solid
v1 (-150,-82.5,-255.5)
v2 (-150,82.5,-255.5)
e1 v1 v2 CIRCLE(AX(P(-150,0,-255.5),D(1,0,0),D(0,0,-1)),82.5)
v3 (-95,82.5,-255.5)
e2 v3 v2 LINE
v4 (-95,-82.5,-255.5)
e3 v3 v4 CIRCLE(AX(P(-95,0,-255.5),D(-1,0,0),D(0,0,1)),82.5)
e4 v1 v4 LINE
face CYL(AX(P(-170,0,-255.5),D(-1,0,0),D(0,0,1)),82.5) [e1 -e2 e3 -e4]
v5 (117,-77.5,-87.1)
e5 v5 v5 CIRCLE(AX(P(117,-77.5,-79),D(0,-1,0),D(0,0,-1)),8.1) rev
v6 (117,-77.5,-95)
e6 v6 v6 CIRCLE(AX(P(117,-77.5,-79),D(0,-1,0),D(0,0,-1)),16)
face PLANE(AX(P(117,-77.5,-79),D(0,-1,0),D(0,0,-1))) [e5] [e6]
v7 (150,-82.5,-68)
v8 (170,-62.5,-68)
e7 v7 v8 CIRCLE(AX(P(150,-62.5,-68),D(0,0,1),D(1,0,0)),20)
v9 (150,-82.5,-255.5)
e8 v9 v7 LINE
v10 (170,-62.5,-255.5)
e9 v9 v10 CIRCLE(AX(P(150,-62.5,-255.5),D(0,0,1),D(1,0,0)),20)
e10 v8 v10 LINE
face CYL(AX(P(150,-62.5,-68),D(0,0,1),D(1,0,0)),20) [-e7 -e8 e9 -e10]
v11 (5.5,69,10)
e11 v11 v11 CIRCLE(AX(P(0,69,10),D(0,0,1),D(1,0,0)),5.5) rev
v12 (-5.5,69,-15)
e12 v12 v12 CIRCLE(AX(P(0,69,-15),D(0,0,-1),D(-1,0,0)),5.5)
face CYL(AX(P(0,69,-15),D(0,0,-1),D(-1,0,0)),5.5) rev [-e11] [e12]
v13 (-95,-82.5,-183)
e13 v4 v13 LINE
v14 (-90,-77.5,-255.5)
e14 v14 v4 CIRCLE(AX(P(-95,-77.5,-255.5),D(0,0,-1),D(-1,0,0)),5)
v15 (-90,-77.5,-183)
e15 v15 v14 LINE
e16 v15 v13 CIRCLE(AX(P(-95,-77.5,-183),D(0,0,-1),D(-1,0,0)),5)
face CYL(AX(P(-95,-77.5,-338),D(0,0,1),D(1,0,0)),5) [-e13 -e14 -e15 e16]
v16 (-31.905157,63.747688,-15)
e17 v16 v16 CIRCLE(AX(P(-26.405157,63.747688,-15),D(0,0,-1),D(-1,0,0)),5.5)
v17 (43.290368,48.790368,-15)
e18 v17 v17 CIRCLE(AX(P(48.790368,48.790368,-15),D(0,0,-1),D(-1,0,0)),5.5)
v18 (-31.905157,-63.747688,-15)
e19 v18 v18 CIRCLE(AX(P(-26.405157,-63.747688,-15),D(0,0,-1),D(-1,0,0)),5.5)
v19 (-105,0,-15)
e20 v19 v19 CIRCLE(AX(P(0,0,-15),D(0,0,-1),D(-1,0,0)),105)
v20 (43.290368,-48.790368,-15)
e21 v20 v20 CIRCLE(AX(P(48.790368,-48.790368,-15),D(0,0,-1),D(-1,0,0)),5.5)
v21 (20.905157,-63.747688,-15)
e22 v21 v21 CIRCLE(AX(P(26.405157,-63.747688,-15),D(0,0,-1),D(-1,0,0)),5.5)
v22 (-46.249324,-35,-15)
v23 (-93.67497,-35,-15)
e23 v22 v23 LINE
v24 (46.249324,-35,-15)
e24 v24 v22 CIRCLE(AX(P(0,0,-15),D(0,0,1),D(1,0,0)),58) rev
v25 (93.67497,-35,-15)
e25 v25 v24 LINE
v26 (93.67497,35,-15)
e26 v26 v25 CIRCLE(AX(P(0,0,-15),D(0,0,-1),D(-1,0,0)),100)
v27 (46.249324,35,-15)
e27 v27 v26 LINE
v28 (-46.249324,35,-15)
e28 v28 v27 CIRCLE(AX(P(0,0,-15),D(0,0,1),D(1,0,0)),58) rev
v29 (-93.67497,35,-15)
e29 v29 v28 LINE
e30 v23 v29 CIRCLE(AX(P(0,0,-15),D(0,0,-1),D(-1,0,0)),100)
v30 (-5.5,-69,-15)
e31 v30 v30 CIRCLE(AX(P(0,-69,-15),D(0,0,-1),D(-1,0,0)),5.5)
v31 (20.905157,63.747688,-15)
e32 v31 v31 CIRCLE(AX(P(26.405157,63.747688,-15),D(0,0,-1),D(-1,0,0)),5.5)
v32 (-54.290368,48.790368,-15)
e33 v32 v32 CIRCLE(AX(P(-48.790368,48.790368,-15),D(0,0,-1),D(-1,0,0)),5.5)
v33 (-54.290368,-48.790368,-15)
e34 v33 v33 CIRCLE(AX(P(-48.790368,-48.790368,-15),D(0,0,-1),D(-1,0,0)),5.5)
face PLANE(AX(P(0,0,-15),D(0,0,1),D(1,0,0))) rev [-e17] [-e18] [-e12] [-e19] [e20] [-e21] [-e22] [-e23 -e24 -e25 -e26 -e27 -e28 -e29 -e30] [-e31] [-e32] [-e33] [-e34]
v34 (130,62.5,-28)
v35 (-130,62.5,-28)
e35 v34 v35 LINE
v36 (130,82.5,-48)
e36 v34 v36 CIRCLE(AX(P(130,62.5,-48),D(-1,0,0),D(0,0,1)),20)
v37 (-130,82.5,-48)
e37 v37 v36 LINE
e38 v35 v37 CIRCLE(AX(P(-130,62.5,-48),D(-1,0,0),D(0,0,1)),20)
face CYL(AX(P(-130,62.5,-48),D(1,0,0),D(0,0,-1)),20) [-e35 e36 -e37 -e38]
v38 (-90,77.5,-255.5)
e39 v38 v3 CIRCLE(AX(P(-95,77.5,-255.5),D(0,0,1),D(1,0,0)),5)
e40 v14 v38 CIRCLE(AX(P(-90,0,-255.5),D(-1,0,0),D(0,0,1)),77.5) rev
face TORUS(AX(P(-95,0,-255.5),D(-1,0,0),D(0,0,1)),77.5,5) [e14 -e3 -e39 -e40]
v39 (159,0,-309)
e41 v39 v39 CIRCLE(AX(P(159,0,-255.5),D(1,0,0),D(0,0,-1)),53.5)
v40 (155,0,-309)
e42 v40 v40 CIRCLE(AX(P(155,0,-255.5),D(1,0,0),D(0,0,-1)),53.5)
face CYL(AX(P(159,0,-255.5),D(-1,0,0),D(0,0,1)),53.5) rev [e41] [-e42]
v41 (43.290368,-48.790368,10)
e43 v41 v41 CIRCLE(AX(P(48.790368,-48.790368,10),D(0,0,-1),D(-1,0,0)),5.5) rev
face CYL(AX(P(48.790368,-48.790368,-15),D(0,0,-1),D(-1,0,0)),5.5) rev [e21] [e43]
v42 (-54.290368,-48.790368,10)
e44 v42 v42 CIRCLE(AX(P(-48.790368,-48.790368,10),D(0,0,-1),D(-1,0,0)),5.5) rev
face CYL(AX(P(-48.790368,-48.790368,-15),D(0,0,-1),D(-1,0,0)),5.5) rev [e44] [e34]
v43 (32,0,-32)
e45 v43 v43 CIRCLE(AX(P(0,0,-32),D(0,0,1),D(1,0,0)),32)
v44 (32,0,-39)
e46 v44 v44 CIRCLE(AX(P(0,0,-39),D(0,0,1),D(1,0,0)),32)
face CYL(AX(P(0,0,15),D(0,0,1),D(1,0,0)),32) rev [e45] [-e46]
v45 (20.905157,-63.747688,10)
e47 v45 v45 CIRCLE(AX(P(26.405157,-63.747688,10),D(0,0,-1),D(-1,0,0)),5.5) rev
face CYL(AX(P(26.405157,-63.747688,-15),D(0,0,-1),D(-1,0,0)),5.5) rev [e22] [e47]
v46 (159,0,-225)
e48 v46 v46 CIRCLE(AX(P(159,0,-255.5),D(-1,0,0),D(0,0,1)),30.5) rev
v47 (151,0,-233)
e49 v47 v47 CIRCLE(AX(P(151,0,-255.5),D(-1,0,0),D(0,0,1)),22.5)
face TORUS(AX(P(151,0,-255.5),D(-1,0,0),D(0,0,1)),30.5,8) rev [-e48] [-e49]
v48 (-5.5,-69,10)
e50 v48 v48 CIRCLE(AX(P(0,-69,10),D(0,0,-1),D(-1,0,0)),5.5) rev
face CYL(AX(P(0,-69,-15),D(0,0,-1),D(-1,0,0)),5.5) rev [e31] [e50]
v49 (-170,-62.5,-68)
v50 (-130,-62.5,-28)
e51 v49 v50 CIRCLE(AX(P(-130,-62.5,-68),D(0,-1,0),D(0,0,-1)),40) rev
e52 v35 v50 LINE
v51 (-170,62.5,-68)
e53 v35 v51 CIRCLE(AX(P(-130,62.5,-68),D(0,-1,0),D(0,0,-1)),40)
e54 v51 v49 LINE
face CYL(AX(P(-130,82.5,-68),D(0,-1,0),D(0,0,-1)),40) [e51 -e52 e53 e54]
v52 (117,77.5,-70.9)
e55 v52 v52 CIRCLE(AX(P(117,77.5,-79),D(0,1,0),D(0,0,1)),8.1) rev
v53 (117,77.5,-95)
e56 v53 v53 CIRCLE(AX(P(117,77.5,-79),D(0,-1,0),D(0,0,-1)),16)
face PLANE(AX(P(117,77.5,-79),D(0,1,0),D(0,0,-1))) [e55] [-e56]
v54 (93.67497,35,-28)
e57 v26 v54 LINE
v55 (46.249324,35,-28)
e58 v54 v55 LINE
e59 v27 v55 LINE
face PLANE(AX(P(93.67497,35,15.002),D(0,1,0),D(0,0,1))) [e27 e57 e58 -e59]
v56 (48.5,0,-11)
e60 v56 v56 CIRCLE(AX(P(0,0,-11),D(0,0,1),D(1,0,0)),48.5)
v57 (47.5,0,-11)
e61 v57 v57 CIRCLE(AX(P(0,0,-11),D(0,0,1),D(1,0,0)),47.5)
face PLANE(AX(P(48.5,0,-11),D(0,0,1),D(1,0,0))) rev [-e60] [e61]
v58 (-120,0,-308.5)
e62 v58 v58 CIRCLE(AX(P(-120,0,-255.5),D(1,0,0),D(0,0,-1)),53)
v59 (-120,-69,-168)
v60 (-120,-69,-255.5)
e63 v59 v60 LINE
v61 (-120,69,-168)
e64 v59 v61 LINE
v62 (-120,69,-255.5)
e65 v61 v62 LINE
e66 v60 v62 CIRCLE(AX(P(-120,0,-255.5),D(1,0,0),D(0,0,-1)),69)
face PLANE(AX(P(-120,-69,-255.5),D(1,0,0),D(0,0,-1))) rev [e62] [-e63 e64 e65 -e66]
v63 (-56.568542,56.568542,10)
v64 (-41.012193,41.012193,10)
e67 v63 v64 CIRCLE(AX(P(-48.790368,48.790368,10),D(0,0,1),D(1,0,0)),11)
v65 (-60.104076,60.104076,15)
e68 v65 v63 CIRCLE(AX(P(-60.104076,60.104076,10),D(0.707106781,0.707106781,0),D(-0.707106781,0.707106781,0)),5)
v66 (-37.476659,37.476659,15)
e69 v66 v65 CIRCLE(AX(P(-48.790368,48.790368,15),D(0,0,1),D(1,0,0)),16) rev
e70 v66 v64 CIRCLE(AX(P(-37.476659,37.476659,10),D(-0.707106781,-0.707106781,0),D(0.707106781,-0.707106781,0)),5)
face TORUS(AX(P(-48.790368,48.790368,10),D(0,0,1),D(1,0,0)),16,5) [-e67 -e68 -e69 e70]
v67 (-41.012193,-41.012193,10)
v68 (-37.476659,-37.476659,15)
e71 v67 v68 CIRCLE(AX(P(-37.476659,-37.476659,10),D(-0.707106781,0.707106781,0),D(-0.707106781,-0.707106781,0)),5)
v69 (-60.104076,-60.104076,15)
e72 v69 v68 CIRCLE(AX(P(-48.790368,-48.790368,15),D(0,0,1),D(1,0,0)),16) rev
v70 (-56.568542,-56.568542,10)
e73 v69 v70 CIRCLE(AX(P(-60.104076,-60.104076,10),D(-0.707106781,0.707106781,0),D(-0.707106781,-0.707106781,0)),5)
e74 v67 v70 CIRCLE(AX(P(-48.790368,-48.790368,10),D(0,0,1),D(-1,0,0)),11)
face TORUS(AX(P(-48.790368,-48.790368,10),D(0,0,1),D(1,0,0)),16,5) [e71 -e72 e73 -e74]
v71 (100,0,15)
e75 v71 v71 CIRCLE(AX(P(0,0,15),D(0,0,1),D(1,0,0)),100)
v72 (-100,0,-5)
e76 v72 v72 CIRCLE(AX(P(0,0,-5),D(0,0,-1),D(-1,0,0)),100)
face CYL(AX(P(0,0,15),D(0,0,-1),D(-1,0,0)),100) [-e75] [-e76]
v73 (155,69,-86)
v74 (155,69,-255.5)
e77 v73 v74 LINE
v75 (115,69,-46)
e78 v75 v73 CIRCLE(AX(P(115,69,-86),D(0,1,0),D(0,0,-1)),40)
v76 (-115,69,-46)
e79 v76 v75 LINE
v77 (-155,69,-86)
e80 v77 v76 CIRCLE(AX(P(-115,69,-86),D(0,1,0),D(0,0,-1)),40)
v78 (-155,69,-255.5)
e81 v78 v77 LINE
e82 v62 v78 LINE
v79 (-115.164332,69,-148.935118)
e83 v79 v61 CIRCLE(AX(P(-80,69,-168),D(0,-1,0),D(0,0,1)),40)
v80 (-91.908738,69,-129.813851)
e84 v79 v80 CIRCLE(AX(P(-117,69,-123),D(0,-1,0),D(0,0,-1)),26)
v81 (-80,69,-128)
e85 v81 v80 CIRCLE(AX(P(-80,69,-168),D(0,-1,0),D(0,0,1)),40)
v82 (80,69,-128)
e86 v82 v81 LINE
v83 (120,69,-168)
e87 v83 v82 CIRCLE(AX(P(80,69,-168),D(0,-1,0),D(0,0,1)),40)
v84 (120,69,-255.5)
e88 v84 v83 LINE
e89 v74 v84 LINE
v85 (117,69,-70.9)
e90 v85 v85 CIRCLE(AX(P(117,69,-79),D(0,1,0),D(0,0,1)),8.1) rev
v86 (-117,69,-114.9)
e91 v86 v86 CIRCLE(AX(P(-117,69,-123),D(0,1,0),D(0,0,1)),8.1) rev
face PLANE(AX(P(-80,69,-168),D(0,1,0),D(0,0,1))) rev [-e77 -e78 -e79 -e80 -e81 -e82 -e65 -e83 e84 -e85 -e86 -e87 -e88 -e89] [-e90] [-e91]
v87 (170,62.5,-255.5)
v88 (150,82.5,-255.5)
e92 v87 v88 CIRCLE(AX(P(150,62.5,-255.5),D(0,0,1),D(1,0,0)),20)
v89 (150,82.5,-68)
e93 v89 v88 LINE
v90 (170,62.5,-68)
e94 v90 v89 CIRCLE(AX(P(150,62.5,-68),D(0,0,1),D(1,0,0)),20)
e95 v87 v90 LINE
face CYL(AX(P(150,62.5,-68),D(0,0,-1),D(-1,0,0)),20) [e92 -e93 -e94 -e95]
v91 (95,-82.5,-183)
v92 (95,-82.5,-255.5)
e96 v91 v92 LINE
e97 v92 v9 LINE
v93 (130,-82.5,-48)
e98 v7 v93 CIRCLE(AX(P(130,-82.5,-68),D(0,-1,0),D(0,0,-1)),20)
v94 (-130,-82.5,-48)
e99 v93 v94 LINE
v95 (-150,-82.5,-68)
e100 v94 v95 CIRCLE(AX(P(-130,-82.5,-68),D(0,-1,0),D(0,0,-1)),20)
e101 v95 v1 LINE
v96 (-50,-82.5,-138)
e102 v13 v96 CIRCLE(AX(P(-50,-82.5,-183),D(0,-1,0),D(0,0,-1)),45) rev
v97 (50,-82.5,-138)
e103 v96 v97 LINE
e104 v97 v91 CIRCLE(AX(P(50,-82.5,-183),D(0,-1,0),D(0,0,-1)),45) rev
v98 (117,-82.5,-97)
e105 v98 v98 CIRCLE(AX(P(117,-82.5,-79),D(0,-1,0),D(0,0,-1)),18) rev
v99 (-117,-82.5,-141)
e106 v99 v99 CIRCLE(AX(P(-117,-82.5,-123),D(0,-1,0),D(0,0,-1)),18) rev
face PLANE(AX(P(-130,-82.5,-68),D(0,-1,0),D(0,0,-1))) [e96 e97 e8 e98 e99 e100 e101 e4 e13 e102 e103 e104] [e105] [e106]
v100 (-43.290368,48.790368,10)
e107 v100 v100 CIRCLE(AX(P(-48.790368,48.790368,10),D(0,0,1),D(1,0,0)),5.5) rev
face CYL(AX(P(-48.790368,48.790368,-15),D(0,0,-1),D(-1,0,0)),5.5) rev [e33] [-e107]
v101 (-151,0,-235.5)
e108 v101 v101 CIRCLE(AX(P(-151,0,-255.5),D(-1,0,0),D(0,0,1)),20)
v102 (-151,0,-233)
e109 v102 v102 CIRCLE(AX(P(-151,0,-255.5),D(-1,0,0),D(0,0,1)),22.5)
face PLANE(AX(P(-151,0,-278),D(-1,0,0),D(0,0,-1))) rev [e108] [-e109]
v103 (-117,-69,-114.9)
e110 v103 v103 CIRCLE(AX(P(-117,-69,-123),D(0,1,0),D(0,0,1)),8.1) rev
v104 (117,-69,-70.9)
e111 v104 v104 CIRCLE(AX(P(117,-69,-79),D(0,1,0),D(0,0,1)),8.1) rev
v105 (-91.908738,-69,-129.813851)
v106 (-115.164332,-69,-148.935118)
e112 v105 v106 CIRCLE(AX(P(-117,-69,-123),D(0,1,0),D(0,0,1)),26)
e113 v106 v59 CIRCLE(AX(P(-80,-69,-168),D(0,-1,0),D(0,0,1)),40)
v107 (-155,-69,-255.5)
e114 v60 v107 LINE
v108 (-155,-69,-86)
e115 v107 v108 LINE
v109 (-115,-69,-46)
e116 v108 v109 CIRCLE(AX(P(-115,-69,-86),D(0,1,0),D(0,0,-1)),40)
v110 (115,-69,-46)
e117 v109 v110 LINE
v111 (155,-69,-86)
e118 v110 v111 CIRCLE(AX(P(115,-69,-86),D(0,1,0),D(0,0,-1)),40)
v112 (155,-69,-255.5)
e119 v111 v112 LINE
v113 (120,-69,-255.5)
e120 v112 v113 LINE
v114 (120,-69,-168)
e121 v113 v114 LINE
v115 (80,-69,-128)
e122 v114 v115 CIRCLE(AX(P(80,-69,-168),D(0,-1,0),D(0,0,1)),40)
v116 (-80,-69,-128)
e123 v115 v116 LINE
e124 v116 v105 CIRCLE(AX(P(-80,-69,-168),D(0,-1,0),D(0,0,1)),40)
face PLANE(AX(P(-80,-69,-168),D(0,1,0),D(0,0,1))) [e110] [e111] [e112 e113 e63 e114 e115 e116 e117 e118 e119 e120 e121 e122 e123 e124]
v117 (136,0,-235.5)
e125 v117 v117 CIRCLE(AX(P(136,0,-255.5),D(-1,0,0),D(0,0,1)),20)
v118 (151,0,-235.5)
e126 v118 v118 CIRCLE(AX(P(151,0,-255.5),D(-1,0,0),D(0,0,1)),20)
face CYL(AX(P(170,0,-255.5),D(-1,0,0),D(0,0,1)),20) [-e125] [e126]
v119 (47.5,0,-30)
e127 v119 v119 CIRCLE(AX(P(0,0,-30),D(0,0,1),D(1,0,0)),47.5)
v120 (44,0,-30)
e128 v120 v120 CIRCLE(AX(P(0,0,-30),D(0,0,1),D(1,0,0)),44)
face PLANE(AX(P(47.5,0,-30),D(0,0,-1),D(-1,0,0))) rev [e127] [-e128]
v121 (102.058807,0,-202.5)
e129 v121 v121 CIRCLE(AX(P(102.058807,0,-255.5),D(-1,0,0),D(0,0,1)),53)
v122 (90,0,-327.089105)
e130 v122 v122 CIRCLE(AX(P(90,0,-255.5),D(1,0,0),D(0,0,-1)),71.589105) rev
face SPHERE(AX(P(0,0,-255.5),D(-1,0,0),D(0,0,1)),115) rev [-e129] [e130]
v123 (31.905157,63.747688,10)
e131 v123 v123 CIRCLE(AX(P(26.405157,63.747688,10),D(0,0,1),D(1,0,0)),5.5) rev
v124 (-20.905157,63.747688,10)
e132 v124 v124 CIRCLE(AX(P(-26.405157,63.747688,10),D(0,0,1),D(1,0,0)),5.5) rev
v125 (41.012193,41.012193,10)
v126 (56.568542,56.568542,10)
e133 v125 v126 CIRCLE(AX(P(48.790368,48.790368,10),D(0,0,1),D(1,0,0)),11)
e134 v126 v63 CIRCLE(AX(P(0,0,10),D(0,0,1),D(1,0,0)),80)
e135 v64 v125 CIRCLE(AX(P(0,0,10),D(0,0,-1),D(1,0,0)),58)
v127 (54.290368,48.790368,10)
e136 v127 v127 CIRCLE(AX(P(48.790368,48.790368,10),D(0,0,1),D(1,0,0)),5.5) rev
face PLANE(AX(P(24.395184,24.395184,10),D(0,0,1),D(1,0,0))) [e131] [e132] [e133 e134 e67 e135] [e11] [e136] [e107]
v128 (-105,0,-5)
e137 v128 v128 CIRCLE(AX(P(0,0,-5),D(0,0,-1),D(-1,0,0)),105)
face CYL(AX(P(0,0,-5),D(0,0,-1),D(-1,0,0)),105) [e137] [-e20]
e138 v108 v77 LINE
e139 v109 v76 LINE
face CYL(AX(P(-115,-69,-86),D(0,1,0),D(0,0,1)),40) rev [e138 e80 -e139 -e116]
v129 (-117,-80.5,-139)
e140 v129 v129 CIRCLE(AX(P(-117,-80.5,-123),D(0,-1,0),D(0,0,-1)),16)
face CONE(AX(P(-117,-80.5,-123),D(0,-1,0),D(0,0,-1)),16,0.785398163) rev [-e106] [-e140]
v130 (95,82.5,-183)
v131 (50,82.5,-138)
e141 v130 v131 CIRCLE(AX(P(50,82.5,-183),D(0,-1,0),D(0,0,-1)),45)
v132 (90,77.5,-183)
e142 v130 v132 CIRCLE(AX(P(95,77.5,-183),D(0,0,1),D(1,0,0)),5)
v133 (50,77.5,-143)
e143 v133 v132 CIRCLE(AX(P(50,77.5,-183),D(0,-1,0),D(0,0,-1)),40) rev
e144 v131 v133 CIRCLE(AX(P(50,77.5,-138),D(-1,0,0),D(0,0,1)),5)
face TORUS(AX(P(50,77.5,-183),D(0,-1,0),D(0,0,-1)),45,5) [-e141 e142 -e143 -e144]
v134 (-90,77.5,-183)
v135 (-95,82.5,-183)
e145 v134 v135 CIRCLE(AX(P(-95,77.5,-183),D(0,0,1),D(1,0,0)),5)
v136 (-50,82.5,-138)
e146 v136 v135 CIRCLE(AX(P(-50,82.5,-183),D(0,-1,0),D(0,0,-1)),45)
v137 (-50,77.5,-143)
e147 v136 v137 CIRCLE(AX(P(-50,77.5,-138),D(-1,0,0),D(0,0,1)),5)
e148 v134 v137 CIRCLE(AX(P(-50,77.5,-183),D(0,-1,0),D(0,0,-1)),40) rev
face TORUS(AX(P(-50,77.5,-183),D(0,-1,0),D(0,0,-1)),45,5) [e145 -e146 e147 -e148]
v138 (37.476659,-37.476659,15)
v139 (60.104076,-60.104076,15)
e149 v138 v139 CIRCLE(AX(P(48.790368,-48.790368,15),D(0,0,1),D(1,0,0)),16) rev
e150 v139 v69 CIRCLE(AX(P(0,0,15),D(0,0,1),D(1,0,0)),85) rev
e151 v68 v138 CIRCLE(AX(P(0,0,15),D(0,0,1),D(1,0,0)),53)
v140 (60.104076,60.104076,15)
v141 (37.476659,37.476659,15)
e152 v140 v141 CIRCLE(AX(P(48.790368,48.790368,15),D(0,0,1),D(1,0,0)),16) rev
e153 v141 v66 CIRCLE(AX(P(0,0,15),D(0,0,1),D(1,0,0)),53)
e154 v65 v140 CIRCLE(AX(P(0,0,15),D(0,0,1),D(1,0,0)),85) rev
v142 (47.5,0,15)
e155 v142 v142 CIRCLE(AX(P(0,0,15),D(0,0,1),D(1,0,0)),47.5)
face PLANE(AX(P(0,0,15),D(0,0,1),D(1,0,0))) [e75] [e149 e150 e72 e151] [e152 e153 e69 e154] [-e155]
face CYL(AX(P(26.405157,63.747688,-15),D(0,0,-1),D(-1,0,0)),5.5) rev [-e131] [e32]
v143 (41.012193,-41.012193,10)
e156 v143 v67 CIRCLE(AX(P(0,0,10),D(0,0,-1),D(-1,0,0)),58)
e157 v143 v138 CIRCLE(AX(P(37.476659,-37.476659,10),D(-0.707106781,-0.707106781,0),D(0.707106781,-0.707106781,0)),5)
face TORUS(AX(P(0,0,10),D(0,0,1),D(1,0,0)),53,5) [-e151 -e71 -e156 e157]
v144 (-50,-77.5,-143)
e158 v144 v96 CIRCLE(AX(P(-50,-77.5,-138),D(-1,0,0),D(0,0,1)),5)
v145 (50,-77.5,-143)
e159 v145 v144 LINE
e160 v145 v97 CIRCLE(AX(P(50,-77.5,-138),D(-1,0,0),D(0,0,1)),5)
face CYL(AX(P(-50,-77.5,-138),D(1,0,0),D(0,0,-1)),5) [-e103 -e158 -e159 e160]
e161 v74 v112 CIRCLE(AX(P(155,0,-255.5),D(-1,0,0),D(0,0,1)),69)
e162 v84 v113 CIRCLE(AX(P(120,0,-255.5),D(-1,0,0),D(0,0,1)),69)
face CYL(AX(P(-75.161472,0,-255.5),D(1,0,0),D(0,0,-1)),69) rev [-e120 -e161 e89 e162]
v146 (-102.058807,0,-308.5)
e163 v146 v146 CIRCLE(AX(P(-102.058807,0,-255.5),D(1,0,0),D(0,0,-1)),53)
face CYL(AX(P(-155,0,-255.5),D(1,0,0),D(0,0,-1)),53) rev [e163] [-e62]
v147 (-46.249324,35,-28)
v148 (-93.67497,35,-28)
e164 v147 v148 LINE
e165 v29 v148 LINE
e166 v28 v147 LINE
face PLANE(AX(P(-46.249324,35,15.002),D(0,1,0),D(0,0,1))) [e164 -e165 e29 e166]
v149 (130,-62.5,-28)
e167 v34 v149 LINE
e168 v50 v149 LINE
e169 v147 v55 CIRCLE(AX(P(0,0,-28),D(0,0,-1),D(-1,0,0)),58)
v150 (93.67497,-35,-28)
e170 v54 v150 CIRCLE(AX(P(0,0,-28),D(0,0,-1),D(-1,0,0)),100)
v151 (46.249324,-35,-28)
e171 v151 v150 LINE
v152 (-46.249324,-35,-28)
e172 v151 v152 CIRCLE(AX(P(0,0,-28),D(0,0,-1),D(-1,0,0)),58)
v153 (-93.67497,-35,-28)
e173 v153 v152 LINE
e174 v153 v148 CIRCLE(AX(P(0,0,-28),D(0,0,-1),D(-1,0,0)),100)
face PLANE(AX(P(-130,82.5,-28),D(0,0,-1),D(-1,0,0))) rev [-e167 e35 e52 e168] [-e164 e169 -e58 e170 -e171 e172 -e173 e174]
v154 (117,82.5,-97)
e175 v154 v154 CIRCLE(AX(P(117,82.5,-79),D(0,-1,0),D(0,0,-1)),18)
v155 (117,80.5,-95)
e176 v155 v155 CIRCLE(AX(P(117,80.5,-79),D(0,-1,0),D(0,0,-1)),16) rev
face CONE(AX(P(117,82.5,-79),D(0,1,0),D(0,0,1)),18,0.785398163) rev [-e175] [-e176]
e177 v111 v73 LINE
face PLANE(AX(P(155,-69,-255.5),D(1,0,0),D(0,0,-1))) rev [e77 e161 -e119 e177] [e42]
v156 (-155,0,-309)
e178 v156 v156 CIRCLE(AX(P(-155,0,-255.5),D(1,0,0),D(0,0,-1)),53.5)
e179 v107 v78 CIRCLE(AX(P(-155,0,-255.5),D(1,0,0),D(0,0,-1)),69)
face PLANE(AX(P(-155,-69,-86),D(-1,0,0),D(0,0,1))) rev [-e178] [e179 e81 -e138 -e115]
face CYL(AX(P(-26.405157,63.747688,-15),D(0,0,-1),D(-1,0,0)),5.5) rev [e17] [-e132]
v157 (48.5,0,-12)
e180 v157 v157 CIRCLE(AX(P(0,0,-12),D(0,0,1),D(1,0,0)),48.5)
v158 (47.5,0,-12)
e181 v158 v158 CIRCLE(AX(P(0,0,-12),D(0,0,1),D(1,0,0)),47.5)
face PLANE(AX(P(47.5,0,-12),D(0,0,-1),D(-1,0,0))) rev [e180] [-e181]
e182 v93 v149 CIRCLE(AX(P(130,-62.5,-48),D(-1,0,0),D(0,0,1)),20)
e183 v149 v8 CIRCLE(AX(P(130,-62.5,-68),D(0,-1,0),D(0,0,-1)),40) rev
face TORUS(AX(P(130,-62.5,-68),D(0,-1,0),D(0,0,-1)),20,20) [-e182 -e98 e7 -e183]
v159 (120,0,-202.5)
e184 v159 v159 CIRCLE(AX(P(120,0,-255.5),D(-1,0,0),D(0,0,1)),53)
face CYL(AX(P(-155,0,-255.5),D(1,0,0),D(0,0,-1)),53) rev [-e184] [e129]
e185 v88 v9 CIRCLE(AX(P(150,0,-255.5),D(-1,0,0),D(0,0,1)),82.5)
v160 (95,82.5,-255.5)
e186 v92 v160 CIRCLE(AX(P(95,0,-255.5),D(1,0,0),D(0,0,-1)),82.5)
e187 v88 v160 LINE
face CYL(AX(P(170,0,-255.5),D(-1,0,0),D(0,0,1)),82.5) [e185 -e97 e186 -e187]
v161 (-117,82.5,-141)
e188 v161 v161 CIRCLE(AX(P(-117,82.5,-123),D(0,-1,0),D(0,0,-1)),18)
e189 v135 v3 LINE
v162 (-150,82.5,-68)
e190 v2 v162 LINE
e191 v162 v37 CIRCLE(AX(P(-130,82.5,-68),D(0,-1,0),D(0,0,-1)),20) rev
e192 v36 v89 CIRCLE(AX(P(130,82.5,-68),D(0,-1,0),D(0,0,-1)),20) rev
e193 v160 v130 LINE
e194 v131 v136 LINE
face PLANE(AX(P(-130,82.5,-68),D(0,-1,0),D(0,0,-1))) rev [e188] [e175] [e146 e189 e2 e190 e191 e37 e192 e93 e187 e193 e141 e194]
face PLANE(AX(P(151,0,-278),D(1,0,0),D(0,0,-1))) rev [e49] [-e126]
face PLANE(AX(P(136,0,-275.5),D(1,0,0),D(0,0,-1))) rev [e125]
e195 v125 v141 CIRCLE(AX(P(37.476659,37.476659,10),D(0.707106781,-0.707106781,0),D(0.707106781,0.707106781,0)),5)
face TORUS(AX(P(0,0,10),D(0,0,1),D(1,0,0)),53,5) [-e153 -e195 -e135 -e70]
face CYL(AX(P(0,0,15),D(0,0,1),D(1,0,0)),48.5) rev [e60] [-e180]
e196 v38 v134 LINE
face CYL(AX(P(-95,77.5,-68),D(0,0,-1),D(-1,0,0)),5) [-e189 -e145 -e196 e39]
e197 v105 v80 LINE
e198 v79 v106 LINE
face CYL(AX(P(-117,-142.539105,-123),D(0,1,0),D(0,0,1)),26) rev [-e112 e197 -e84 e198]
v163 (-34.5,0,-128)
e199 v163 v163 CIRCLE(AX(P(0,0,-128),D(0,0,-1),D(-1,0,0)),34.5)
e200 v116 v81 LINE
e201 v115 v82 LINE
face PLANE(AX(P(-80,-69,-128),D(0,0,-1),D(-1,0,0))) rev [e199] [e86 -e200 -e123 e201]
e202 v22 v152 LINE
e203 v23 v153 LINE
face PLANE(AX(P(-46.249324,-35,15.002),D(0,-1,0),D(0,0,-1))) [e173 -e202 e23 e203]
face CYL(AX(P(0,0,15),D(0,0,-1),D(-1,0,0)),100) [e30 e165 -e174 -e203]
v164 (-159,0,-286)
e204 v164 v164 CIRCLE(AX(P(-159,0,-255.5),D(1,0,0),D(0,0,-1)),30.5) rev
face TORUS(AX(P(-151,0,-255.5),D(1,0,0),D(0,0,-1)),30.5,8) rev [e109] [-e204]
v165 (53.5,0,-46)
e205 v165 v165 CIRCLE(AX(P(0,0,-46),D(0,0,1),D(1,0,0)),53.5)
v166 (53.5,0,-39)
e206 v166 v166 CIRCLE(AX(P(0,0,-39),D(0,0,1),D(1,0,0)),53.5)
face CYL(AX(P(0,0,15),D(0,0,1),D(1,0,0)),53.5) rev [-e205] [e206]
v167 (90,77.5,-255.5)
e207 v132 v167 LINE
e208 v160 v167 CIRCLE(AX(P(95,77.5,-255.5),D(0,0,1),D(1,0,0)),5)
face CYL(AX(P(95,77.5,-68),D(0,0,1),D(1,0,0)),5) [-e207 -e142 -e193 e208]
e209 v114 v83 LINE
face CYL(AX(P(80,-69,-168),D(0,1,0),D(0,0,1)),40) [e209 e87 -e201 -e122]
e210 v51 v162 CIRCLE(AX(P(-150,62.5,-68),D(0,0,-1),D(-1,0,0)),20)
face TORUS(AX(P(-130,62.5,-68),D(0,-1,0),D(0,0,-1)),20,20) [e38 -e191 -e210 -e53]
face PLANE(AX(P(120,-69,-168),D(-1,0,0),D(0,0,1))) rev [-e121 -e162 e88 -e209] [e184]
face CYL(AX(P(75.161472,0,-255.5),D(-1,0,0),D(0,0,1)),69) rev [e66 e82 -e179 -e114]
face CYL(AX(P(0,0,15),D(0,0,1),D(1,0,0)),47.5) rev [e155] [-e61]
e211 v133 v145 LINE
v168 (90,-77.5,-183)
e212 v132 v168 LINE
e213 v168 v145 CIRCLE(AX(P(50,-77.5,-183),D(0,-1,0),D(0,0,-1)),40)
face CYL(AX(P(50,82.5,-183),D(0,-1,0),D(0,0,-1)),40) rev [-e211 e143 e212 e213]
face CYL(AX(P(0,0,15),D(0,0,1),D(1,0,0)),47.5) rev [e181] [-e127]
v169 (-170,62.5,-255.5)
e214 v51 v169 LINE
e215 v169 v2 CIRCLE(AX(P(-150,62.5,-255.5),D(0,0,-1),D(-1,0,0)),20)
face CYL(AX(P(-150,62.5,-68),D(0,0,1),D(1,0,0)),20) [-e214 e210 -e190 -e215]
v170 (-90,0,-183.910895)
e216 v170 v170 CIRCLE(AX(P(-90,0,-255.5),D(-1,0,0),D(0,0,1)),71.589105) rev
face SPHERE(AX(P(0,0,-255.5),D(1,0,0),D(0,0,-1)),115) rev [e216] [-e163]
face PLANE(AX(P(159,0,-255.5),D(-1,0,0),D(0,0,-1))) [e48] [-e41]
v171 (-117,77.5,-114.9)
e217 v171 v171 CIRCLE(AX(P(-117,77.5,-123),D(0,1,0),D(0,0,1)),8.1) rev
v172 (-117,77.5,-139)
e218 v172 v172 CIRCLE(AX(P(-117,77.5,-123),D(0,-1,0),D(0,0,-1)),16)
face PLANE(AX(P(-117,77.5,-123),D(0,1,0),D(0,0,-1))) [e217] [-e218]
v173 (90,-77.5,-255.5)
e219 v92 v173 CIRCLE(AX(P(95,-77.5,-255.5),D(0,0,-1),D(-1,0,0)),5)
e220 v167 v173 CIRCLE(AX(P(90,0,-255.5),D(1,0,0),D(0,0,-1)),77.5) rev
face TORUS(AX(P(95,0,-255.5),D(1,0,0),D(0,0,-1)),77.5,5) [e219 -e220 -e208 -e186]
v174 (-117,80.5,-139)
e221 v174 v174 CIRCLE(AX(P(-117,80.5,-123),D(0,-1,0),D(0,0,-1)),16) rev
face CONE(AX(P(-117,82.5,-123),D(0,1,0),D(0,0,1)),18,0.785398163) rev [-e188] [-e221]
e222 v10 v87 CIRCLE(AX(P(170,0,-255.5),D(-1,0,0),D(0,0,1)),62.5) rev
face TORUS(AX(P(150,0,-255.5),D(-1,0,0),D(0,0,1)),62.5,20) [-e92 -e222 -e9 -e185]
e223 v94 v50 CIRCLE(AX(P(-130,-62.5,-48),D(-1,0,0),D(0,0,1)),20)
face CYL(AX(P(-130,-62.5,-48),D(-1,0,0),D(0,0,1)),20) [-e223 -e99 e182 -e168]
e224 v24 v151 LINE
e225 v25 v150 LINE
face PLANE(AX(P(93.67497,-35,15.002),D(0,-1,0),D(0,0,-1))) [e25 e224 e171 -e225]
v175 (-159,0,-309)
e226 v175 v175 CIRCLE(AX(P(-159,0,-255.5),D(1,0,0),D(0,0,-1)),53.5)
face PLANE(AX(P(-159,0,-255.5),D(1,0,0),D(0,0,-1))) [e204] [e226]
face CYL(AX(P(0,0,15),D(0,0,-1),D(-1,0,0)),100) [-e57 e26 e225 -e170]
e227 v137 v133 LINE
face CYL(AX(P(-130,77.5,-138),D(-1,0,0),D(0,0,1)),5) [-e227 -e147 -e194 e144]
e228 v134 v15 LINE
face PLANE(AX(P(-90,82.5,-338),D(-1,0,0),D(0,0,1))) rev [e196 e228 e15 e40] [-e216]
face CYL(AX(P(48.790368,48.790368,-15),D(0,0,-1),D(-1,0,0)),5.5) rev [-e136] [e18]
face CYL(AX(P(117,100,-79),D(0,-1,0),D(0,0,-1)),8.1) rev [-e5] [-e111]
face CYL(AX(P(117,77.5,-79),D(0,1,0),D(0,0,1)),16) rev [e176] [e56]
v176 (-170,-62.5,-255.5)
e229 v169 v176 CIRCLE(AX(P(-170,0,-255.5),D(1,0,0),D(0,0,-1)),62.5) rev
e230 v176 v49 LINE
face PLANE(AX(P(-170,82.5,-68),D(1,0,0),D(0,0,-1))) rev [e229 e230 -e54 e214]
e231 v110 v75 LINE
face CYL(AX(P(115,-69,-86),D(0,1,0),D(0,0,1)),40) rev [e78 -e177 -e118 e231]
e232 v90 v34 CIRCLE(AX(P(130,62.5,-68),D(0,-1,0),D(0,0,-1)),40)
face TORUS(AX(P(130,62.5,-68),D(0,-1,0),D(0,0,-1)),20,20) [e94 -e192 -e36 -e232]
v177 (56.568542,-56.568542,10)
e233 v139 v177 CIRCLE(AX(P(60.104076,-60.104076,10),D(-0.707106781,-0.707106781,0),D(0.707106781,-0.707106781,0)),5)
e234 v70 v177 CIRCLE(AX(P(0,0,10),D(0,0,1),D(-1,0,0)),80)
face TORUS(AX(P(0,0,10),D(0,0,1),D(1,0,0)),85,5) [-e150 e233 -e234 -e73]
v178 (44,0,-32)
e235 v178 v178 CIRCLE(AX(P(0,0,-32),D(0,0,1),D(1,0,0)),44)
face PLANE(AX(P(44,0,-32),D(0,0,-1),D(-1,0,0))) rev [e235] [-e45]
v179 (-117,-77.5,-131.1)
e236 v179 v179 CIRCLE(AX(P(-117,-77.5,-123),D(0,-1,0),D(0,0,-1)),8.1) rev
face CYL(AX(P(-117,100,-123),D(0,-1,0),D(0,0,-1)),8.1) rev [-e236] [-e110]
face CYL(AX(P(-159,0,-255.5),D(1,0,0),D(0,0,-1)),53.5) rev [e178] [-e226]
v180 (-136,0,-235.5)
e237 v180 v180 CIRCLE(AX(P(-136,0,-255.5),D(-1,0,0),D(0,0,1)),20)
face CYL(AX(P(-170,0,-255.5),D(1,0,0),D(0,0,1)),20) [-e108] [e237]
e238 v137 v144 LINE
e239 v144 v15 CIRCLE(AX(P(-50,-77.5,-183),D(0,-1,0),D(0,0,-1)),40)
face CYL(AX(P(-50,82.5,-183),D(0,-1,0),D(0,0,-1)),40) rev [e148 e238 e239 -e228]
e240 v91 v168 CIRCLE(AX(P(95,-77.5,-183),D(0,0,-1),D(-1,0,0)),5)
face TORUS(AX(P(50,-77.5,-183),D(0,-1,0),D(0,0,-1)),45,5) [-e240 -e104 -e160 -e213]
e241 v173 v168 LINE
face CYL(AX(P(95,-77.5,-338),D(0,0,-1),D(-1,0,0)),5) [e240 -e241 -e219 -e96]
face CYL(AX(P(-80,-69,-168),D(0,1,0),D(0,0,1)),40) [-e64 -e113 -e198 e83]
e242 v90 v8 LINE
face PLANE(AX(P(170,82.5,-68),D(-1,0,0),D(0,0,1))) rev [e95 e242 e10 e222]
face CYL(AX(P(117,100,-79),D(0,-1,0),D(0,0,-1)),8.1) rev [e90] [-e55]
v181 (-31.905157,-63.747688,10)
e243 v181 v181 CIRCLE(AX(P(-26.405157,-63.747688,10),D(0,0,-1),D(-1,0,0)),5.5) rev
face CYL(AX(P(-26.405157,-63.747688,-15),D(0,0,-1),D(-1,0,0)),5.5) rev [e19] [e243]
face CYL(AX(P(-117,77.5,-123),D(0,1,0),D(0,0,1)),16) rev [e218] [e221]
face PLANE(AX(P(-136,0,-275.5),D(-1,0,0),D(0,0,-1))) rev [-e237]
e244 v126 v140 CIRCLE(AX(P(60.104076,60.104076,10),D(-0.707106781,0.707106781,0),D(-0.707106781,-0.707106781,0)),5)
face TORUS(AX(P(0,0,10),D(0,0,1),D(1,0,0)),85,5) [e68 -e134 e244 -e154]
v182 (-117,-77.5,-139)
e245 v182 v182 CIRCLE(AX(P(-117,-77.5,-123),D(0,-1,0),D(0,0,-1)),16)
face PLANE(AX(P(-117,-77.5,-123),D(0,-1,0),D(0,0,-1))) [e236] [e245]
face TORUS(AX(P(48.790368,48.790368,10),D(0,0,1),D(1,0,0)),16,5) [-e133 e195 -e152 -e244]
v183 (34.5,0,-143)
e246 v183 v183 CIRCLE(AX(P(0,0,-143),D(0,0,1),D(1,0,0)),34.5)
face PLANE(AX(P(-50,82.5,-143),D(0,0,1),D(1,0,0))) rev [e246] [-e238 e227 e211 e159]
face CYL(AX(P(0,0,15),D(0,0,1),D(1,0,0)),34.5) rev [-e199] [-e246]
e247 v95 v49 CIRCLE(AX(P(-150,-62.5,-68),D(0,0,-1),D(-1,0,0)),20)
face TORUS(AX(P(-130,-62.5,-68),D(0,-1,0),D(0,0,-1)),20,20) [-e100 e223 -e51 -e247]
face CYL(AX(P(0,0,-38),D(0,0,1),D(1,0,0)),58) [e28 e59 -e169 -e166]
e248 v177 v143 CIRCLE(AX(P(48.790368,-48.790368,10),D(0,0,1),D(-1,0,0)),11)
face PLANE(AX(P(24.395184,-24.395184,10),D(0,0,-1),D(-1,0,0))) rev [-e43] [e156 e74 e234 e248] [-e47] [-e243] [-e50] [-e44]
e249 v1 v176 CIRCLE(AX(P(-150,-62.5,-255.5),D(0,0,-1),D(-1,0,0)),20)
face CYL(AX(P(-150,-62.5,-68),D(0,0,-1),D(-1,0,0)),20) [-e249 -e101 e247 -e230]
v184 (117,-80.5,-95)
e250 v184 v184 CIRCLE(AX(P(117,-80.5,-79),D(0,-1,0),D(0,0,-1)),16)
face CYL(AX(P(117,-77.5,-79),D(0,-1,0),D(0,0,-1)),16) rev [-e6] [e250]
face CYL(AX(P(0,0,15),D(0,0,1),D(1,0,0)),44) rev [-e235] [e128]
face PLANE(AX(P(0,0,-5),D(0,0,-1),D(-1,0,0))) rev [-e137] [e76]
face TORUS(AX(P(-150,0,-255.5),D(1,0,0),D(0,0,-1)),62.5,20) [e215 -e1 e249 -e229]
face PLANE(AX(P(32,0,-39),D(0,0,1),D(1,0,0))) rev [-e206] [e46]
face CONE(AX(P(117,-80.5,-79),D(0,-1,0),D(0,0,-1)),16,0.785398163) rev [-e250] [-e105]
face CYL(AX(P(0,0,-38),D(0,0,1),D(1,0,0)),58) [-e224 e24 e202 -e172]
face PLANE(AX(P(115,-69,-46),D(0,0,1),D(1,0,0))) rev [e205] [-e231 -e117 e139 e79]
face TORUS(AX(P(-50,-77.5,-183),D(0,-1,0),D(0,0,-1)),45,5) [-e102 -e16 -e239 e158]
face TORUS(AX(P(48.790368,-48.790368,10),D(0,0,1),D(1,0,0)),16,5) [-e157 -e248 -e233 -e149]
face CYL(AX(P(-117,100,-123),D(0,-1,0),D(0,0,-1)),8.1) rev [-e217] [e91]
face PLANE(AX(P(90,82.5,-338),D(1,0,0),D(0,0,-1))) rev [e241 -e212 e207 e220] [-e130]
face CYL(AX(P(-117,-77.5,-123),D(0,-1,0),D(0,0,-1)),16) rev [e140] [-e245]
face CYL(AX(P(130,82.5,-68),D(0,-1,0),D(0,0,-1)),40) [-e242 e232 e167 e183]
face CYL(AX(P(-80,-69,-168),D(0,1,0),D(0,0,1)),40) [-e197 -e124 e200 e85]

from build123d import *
from build123d.topology import SkipClean

# Parameters (mm, degrees)
SKETCH1_R                  = 100
EXTRUDE1_DEPTH             = 15
F_11_0_11_DIAMETER_HOLE3_D = 11
EXTRUDE2_DEPTH             = 5
FILLET1_R                  = 5
SKETCH12_R                 = 58
EXTRUDE6_DEPTH             = 23
EXTRUDE7_REACH             = 153.026
EXTRUDE12_DEPTH            = 82.5
FILLET2_RADIUS             = 82.5
FILLET2_LENGTH             = 80
FILLET3_RADIUS             = 82.5
FILLET3_LENGTH             = 80
EXTRUDE13_DEPTH            = 69
FILLET4_R                  = 20
SKETCH24_R                 = 53
EXTRUDE14_DEPTH            = 155
SKETCH27_R                 = 69
EXTRUDE16_DEPTH            = 35
EXTRUDE17_START            = 35
SKETCH28_R                 = 69
EXTRUDE17_DEPTH            = 35
SKETCH30_R                 = 53.5
EXTRUDE18_DEPTH            = 4
FILLET5_R                  = 8
SKETCH34_R                 = 26
EXTRUDE19_DEPTH            = 138
SKETCH35_R                 = 16
EXTRUDE21_DEPTH            = 5
CHAMFER2_SIZE              = 2
EXTRUDE22_DEPTH            = 392.336173
EXTRUDE22_DEPTH_BACK       = 392.336173
SKETCH36_R                 = 8.1
FILLET6_R                  = 5
SKETCH37_R                 = 105
SKETCH37_R_2               = 100
EXTRUDE23_DEPTH            = 10


with BuildPart() as part:
    # Sketch1 → Extrude1 (new, symmetric)
    with BuildSketch(Plane.XY):
        Circle(SKETCH1_R)
    extrude(amount=EXTRUDE1_DEPTH, both=True)

    # Ø11.0 (11) Diameter Hole3 (through all)
    with Locations(Plane(origin=(0, 0, -15), x_dir=(-1, 0, 0), z_dir=(0, 0, -1))):
        with Locations((-48.790368, 48.790368), (-26.405157, 63.747688), (0, 69), (26.405157, 63.747688), (48.790368, 48.790368), (48.790368, -48.790368), (26.405157, -63.747688), (0, -69), (-26.405157, -63.747688), (-48.790368, -48.790368)):
            Hole(F_11_0_11_DIAMETER_HOLE3_D / 2)

    # Sketch2 → Extrude2 (cut)
    with BuildSketch(Plane.XY.offset(15)):
        with BuildLine():
            ThreePointArc((56.568542, 56.568542), (0, 80), (-56.568542, 56.568542))
            ThreePointArc((-56.568542, 56.568542), (-56.568542, 41.012193), (-41.012193, 41.012193))
            ThreePointArc((-41.012193, 41.012193), (0, 58), (41.012193, 41.012193))
            ThreePointArc((41.012193, 41.012193), (56.568542, 41.012193), (56.568542, 56.568542))
        make_face()
        with BuildLine():
            ThreePointArc((56.568542, -56.568542), (0, -80), (-56.568542, -56.568542))
            ThreePointArc((-56.568542, -56.568542), (-56.568542, -41.012193), (-41.012193, -41.012193))
            ThreePointArc((-41.012193, -41.012193), (0, -58), (41.012193, -41.012193))
            ThreePointArc((41.012193, -41.012193), (56.568542, -41.012193), (56.568542, -56.568542))
        make_face()
    extrude(amount=-EXTRUDE2_DEPTH, mode=Mode.SUBTRACT)

    # Fillet1
    fillet1_edges = [part.edges().sort_by_distance(p)[0] for p in [
        (-56.568542, -41.012193, 15),
        (0, -80, 15),
        (56.568542, -41.012193, 15),
        (0, -58, 15),
        (0, 80, 15),
        (-56.568542, 41.012193, 15),
        (56.568542, 41.012193, 15),
        (0, 58, 15),
    ]]
    fillet(fillet1_edges, radius=FILLET1_R - 0.0001)  # a hair under: the kernel refuses the full size

    # Sketch12 → Extrude6 (add)
    with BuildSketch(Plane(origin=(0, 0, -15), x_dir=(-1, 0, 0), z_dir=(0, 0, -1))):
        with Locations(Location((0, 0, 0), (0, 0, 180))):
            Circle(SKETCH12_R)
    extrude(amount=EXTRUDE6_DEPTH)

    # Sketch15 → Cut-Revolve1 (revolve, cut)
    with BuildSketch(Plane(origin=(0, 0, 0), x_dir=(1, 0, 0), z_dir=(0, 1, 0))):
        Polygon((0, 38), (32, 38), (32, 32), (44, 32), (44, 30), (47.5, 30), (47.5, 12), (48.5, 12), (48.5, 11), (47.5, 11), (47.5, -15), (0, -15), align=None)
    revolve(axis=Axis((0, 0, 15), (0, 0, -1)), mode=Mode.SUBTRACT)

    # Sketch16 → Extrude7 (add, up to next)
    with BuildSketch(Plane(origin=(0, 0, -38), x_dir=(-1, 0, 0), z_dir=(0, 0, -1)), mode=Mode.PRIVATE) as extrude7_sk1:
        with BuildLine():
            Line((-93.67497, 35), (-46.249324, 35))
            ThreePointArc((-46.249324, 35), (-58, 0), (-46.249324, -35))
            Line((-46.249324, -35), (-93.67497, -35))
            ThreePointArc((-93.67497, -35), (-100, 0), (-93.67497, 35))
        make_face()
    extrude7_tool1 = extrude(extrude7_sk1.sketch, amount=-EXTRUDE7_REACH, mode=Mode.PRIVATE) - part.part
    # Sketch16 → Extrude7 (add, up to next)
    with BuildSketch(Plane(origin=(0, 0, -38), x_dir=(-1, 0, 0), z_dir=(0, 0, -1)), mode=Mode.PRIVATE) as extrude7_sk2:
        with BuildLine():
            Line((46.249324, 35), (93.67497, 35))
            ThreePointArc((93.67497, 35), (100, 0), (93.67497, -35))
            Line((93.67497, -35), (46.249324, -35))
            ThreePointArc((46.249324, -35), (58, 0), (46.249324, 35))
        make_face()
    extrude7_tool2 = extrude(extrude7_sk2.sketch, amount=-EXTRUDE7_REACH, mode=Mode.PRIVATE) - part.part
    add(extrude7_tool1.solids().sort_by_distance((75.992672, 0, -38))[0])
    add(extrude7_tool2.solids().sort_by_distance((-75.992672, 0, -38))[0])

    # Sketch20 → Extrude12 (add, symmetric)
    with BuildSketch(Plane(origin=(0, 0, 0), x_dir=(1, 0, 0), z_dir=(0, 1, 0))):
        with BuildLine():
            Line((-50, 143), (50, 143))
            ThreePointArc((50, 143), (78.284271, 154.715729), (90, 183))
            Line((90, 183), (90, 338))
            Line((90, 338), (170, 338))
            Line((170, 338), (170, 68))
            ThreePointArc((170, 68), (158.284271, 39.715729), (130, 28))
            Line((130, 28), (-130, 28))
            ThreePointArc((-130, 28), (-158.284271, 39.715729), (-170, 68))
            Line((-170, 68), (-170, 338))
            Line((-170, 338), (-90, 338))
            Line((-90, 338), (-90, 183))
            ThreePointArc((-90, 183), (-78.284271, 154.715729), (-50, 143))
        make_face()
    extrude(amount=EXTRUDE12_DEPTH, both=True)

    # Fillet2: full round fillet: the end face becomes a half cylinder, R = half its width
    fillet2_face = Plane((130, 0, -338), x_dir=(-1, 0, 0), z_dir=(0, 0, -1))  # on the end face: x along it, z out of the body
    fillet2_slab = fillet2_face.offset(-FILLET2_RADIUS / 2) * Box(FILLET2_LENGTH, 2 * FILLET2_RADIUS, FILLET2_RADIUS, mode=Mode.PRIVATE)  # the body's end, R deep
    fillet2_round = Plane((130, 0, -255.5), x_dir=(0, 0, -1), z_dir=(-1, 0, 0)) * Cylinder(FILLET2_RADIUS, FILLET2_LENGTH, mode=Mode.PRIVATE)  # its axis R under the face
    add(fillet2_slab - fillet2_round, mode=Mode.SUBTRACT)

    # Fillet3: full round fillet: the end face becomes a half cylinder, R = half its width
    fillet3_face = Plane((-130, 0, -338), x_dir=(-1, 0, 0), z_dir=(0, 0, -1))  # on the end face: x along it, z out of the body
    fillet3_slab = fillet3_face.offset(-FILLET3_RADIUS / 2) * Box(FILLET3_LENGTH, 2 * FILLET3_RADIUS, FILLET3_RADIUS, mode=Mode.PRIVATE)  # the body's end, R deep
    fillet3_round = Plane((-130, 0, -255.5), x_dir=(0, 0, -1), z_dir=(-1, 0, 0)) * Cylinder(FILLET3_RADIUS, FILLET3_LENGTH, mode=Mode.PRIVATE)  # its axis R under the face
    add(fillet3_slab - fillet3_round, mode=Mode.SUBTRACT)

    # Sketch21 → Cut-Revolve2 (revolve, cut)
    with BuildSketch(Plane(origin=(0, 0, 0), x_dir=(1, 0, 0), z_dir=(0, 1, 0)), mode=Mode.PRIVATE) as cut_revolve2_sk:
        with BuildLine():
            Line((0, 370.5), (0, 153))
            Line((0, 153), (52.141634, 153))
            ThreePointArc((52.141634, 153), (111.831346, 282.309513), (0, 370.5))
        make_face()
    revolve(cut_revolve2_sk.sketch.rotate(Axis((0, 0, -370.5), (0, 0, 1)), 159.512685), axis=Axis((0, 0, -370.5), (0, 0, 1)), mode=Mode.SUBTRACT)

    # Sketch23 → Extrude13 (cut, symmetric)
    with BuildSketch(Plane(origin=(0, 0, 0), x_dir=(1, 0, 0), z_dir=(0, 1, 0))):
        with BuildLine():
            Line((-155, 255.5), (-120, 255.5))
            Line((-120, 255.5), (-120, 168))
            ThreePointArc((-120, 168), (-108.284271, 139.715729), (-80, 128))
            Line((-80, 128), (80, 128))
            ThreePointArc((80, 128), (108.284271, 139.715729), (120, 168))
            Line((120, 168), (120, 255.5))
            Line((120, 255.5), (155, 255.5))
            Line((155, 255.5), (155, 86))
            ThreePointArc((155, 86), (143.284271, 57.715729), (115, 46))
            Line((115, 46), (-115, 46))
            ThreePointArc((-115, 46), (-143.284271, 57.715729), (-155, 86))
            Line((-155, 86), (-155, 255.5))
        make_face()
    extrude(amount=EXTRUDE13_DEPTH, both=True, mode=Mode.SUBTRACT)

    # Fillet4
    fillet4_edges = [part.edges().sort_by_distance(p)[0] for p in [
        (-158.284271, -82.5, -39.715729),
        (0, -82.5, -28),
        (158.284271, -82.5, -39.715729),
        (170, -82.5, -161.75),
        (-158.284271, 82.5, -39.715729),
        (0, 82.5, -28),
        (158.284271, 82.5, -39.715729),
        (170, 82.5, -161.75),
        (170, -58.336309, -313.836309),
        (-170, -82.5, -161.75),
        (-170, 82.5, -161.75),
        (-170, -58.336309, -313.836309),
    ]]
    fillet(fillet4_edges, radius=FILLET4_R)

    # Sketch24 → Extrude14 (cut, symmetric)
    with SkipClean():  # the faces are left unmerged after this step: merging them gives an invalid solid
        with BuildSketch(Plane(origin=(0, 0, 0), x_dir=(0, 0, -1), z_dir=(1, 0, 0))):
            with Locations(Location((255.5, 0, 0), (0, 0, 90))):
                Circle(SKETCH24_R)
        extrude(amount=EXTRUDE14_DEPTH, both=True, mode=Mode.SUBTRACT)

    # Sketch27 → Extrude16 (cut)
    with SkipClean():  # the faces are left unmerged after this step: merging them gives an invalid solid
        with BuildSketch(Plane(origin=(-155, 0, 0), x_dir=(0, 0, -1), z_dir=(1, 0, 0))):
            with Locations((255.5, 0)):
                Circle(SKETCH27_R)
        extrude(amount=EXTRUDE16_DEPTH, mode=Mode.SUBTRACT)

    # Sketch28 → Extrude17 (cut)
    with SkipClean():  # the faces are left unmerged after this step: merging them gives an invalid solid
        with BuildSketch(Plane.ZY.offset(-155).offset(EXTRUDE17_START)):
            with Locations((-255.5, 0)):
                Circle(SKETCH28_R)
        extrude(amount=-EXTRUDE17_DEPTH, mode=Mode.SUBTRACT)

    # Sketch29 → Cut-Revolve3 (revolve, cut)
    with SkipClean():  # the faces are left unmerged after this step: merging them gives an invalid solid
        with BuildSketch(Plane(origin=(0, 0, 0), x_dir=(1, 0, 0), z_dir=(0, 1, 0))):
            Polygon((0, 28), (47.5, 28), (47.5, 30), (44, 30), (44, 32), (32, 32), (32, 39), (53.5, 39), (53.5, 127), (34.5, 127), (34.5, 143), (0, 143), align=None)
        revolve(axis=Axis((0, 0, 15), (0, 0, -1)), mode=Mode.SUBTRACT)

    # Sketch30 → Extrude18 (cut)
    with SkipClean():  # the faces are left unmerged after this step: merging them gives an invalid solid
        with BuildSketch(Plane(origin=(-155, 0, 0), x_dir=(0, 0, -1), z_dir=(1, 0, 0))):
            with Locations((255.5, 0)):
                Circle(SKETCH30_R)
        extrude18 = extrude(amount=-EXTRUDE18_DEPTH, mode=Mode.SUBTRACT)

    # Mirror1: Extrude18 across plane
    with SkipClean():  # the faces are left unmerged after this step: merging them gives an invalid solid
        add(extrude18.mirror(Plane(origin=(0, 0, 0), x_dir=(0, 0, 1), z_dir=(1, 0, 0))), mode=Mode.SUBTRACT)

    # Sketch33 → Revolve1 (revolve)
    with SkipClean():  # the faces are left unmerged after this step: merging them gives an invalid solid
        with BuildSketch(Plane(origin=(0, 0, 0), x_dir=(1, 0, 0), z_dir=(0, 1, 0)), mode=Mode.PRIVATE) as revolve1_sk:
            Polygon((159, 255.5), (159, 278), (151, 278), (151, 275.5), (136, 275.5), (136, 255.5), align=None)
        revolve1 = revolve(revolve1_sk.sketch.rotate(Axis((170, 0, -255.5), (1, 0, 0)), 180), axis=Axis((170, 0, -255.5), (1, 0, 0)))

    # Mirror2: Revolve1 across plane
    with SkipClean():  # the faces are left unmerged after this step: merging them gives an invalid solid
        add(revolve1.mirror(Plane(origin=(0, 0, 0), x_dir=(0, 0, 1), z_dir=(1, 0, 0))))

    # Fillet5
    fillet5_edges = [part.edges().sort_by_distance(p)[0] for p in [
        (159, 0, -278),
        (-159, 0, -278),
    ]]
    fillet(fillet5_edges, radius=FILLET5_R - 0.0001)  # a hair under: the kernel refuses the full size

    # Sketch34 → Extrude19 (cut)
    with SkipClean():  # the faces are left unmerged after this step: merging them gives an invalid solid
        with BuildSketch(Plane.XZ.offset(-69)):
            with Locations((-117, -123)):
                Circle(SKETCH34_R)
        extrude(amount=EXTRUDE19_DEPTH, mode=Mode.SUBTRACT)

    # Sketch35 → Extrude21 (cut)
    with SkipClean():  # the faces are left unmerged after this step: merging them gives an invalid solid
        with BuildSketch(Plane.XZ.offset(82.5)):
            with Locations(Location((-117, -123, 0), (0, 0, 270))):
                Circle(SKETCH35_R)
            with Locations(Location((117, -79, 0), (0, 0, 270))):
                Circle(SKETCH35_R)
        extrude21 = extrude(amount=-EXTRUDE21_DEPTH, mode=Mode.SUBTRACT)

    # Mirror5: Extrude21 across plane
    with SkipClean():  # the faces are left unmerged after this step: merging them gives an invalid solid
        add(extrude21.mirror(Plane.ZX), mode=Mode.SUBTRACT)

    # Chamfer2
    chamfer2_edges = [part.edges().sort_by_distance(p)[0] for p in [
        (-117, -82.5, -107),
        (117, -82.5, -63),
        (-117, 82.5, -107),
        (117, 82.5, -63),
    ]]
    chamfer(chamfer2_edges, length=CHAMFER2_SIZE)

    # Sketch36 → Extrude22 (cut, two sides: drawn at the far end of the back side and taken through both)
    with SkipClean():  # the faces are left unmerged after this step: merging them gives an invalid solid
        with BuildSketch(Plane(origin=(0, 0, 0), x_dir=(1, 0, 0), z_dir=(0, 1, 0)).offset(-EXTRUDE22_DEPTH_BACK)):
            with Locations(Location((-117, 123, 0), (0, 0, 270))):
                Circle(SKETCH36_R)
            with Locations(Location((117, 79, 0), (0, 0, 270))):
                Circle(SKETCH36_R)
        extrude(amount=EXTRUDE22_DEPTH + EXTRUDE22_DEPTH_BACK, mode=Mode.SUBTRACT)

    # Fillet6
    fillet6_edges = [part.edges().sort_by_distance(p)[0] for p in [
        (78.284271, -82.5, -154.715729),
        (0, -82.5, -143),
        (-78.284271, -82.5, -154.715729),
        (-90, -82.5, -219.25),
        (78.284271, 82.5, -154.715729),
        (0, 82.5, -143),
        (-78.284271, 82.5, -154.715729),
        (-90, 82.5, -219.25),
        (90, 82.5, -219.25),
        (90, -82.5, -219.25),
        (90, -58.336309, -313.836309),
        (-90, -58.336309, -313.836309),
    ]]
    fillet(fillet6_edges, radius=FILLET6_R)

    # Sketch37 → Extrude23 (add)
    with SkipClean():  # the faces are left unmerged after this step: merging them gives an invalid solid
        with BuildSketch(Plane(origin=(0, 0, -15), x_dir=(-1, 0, 0), z_dir=(0, 0, -1))):
            Circle(SKETCH37_R)
            Circle(SKETCH37_R_2, mode=Mode.SUBTRACT)
        extrude(amount=-EXTRUDE23_DEPTH)


solid = part.part
